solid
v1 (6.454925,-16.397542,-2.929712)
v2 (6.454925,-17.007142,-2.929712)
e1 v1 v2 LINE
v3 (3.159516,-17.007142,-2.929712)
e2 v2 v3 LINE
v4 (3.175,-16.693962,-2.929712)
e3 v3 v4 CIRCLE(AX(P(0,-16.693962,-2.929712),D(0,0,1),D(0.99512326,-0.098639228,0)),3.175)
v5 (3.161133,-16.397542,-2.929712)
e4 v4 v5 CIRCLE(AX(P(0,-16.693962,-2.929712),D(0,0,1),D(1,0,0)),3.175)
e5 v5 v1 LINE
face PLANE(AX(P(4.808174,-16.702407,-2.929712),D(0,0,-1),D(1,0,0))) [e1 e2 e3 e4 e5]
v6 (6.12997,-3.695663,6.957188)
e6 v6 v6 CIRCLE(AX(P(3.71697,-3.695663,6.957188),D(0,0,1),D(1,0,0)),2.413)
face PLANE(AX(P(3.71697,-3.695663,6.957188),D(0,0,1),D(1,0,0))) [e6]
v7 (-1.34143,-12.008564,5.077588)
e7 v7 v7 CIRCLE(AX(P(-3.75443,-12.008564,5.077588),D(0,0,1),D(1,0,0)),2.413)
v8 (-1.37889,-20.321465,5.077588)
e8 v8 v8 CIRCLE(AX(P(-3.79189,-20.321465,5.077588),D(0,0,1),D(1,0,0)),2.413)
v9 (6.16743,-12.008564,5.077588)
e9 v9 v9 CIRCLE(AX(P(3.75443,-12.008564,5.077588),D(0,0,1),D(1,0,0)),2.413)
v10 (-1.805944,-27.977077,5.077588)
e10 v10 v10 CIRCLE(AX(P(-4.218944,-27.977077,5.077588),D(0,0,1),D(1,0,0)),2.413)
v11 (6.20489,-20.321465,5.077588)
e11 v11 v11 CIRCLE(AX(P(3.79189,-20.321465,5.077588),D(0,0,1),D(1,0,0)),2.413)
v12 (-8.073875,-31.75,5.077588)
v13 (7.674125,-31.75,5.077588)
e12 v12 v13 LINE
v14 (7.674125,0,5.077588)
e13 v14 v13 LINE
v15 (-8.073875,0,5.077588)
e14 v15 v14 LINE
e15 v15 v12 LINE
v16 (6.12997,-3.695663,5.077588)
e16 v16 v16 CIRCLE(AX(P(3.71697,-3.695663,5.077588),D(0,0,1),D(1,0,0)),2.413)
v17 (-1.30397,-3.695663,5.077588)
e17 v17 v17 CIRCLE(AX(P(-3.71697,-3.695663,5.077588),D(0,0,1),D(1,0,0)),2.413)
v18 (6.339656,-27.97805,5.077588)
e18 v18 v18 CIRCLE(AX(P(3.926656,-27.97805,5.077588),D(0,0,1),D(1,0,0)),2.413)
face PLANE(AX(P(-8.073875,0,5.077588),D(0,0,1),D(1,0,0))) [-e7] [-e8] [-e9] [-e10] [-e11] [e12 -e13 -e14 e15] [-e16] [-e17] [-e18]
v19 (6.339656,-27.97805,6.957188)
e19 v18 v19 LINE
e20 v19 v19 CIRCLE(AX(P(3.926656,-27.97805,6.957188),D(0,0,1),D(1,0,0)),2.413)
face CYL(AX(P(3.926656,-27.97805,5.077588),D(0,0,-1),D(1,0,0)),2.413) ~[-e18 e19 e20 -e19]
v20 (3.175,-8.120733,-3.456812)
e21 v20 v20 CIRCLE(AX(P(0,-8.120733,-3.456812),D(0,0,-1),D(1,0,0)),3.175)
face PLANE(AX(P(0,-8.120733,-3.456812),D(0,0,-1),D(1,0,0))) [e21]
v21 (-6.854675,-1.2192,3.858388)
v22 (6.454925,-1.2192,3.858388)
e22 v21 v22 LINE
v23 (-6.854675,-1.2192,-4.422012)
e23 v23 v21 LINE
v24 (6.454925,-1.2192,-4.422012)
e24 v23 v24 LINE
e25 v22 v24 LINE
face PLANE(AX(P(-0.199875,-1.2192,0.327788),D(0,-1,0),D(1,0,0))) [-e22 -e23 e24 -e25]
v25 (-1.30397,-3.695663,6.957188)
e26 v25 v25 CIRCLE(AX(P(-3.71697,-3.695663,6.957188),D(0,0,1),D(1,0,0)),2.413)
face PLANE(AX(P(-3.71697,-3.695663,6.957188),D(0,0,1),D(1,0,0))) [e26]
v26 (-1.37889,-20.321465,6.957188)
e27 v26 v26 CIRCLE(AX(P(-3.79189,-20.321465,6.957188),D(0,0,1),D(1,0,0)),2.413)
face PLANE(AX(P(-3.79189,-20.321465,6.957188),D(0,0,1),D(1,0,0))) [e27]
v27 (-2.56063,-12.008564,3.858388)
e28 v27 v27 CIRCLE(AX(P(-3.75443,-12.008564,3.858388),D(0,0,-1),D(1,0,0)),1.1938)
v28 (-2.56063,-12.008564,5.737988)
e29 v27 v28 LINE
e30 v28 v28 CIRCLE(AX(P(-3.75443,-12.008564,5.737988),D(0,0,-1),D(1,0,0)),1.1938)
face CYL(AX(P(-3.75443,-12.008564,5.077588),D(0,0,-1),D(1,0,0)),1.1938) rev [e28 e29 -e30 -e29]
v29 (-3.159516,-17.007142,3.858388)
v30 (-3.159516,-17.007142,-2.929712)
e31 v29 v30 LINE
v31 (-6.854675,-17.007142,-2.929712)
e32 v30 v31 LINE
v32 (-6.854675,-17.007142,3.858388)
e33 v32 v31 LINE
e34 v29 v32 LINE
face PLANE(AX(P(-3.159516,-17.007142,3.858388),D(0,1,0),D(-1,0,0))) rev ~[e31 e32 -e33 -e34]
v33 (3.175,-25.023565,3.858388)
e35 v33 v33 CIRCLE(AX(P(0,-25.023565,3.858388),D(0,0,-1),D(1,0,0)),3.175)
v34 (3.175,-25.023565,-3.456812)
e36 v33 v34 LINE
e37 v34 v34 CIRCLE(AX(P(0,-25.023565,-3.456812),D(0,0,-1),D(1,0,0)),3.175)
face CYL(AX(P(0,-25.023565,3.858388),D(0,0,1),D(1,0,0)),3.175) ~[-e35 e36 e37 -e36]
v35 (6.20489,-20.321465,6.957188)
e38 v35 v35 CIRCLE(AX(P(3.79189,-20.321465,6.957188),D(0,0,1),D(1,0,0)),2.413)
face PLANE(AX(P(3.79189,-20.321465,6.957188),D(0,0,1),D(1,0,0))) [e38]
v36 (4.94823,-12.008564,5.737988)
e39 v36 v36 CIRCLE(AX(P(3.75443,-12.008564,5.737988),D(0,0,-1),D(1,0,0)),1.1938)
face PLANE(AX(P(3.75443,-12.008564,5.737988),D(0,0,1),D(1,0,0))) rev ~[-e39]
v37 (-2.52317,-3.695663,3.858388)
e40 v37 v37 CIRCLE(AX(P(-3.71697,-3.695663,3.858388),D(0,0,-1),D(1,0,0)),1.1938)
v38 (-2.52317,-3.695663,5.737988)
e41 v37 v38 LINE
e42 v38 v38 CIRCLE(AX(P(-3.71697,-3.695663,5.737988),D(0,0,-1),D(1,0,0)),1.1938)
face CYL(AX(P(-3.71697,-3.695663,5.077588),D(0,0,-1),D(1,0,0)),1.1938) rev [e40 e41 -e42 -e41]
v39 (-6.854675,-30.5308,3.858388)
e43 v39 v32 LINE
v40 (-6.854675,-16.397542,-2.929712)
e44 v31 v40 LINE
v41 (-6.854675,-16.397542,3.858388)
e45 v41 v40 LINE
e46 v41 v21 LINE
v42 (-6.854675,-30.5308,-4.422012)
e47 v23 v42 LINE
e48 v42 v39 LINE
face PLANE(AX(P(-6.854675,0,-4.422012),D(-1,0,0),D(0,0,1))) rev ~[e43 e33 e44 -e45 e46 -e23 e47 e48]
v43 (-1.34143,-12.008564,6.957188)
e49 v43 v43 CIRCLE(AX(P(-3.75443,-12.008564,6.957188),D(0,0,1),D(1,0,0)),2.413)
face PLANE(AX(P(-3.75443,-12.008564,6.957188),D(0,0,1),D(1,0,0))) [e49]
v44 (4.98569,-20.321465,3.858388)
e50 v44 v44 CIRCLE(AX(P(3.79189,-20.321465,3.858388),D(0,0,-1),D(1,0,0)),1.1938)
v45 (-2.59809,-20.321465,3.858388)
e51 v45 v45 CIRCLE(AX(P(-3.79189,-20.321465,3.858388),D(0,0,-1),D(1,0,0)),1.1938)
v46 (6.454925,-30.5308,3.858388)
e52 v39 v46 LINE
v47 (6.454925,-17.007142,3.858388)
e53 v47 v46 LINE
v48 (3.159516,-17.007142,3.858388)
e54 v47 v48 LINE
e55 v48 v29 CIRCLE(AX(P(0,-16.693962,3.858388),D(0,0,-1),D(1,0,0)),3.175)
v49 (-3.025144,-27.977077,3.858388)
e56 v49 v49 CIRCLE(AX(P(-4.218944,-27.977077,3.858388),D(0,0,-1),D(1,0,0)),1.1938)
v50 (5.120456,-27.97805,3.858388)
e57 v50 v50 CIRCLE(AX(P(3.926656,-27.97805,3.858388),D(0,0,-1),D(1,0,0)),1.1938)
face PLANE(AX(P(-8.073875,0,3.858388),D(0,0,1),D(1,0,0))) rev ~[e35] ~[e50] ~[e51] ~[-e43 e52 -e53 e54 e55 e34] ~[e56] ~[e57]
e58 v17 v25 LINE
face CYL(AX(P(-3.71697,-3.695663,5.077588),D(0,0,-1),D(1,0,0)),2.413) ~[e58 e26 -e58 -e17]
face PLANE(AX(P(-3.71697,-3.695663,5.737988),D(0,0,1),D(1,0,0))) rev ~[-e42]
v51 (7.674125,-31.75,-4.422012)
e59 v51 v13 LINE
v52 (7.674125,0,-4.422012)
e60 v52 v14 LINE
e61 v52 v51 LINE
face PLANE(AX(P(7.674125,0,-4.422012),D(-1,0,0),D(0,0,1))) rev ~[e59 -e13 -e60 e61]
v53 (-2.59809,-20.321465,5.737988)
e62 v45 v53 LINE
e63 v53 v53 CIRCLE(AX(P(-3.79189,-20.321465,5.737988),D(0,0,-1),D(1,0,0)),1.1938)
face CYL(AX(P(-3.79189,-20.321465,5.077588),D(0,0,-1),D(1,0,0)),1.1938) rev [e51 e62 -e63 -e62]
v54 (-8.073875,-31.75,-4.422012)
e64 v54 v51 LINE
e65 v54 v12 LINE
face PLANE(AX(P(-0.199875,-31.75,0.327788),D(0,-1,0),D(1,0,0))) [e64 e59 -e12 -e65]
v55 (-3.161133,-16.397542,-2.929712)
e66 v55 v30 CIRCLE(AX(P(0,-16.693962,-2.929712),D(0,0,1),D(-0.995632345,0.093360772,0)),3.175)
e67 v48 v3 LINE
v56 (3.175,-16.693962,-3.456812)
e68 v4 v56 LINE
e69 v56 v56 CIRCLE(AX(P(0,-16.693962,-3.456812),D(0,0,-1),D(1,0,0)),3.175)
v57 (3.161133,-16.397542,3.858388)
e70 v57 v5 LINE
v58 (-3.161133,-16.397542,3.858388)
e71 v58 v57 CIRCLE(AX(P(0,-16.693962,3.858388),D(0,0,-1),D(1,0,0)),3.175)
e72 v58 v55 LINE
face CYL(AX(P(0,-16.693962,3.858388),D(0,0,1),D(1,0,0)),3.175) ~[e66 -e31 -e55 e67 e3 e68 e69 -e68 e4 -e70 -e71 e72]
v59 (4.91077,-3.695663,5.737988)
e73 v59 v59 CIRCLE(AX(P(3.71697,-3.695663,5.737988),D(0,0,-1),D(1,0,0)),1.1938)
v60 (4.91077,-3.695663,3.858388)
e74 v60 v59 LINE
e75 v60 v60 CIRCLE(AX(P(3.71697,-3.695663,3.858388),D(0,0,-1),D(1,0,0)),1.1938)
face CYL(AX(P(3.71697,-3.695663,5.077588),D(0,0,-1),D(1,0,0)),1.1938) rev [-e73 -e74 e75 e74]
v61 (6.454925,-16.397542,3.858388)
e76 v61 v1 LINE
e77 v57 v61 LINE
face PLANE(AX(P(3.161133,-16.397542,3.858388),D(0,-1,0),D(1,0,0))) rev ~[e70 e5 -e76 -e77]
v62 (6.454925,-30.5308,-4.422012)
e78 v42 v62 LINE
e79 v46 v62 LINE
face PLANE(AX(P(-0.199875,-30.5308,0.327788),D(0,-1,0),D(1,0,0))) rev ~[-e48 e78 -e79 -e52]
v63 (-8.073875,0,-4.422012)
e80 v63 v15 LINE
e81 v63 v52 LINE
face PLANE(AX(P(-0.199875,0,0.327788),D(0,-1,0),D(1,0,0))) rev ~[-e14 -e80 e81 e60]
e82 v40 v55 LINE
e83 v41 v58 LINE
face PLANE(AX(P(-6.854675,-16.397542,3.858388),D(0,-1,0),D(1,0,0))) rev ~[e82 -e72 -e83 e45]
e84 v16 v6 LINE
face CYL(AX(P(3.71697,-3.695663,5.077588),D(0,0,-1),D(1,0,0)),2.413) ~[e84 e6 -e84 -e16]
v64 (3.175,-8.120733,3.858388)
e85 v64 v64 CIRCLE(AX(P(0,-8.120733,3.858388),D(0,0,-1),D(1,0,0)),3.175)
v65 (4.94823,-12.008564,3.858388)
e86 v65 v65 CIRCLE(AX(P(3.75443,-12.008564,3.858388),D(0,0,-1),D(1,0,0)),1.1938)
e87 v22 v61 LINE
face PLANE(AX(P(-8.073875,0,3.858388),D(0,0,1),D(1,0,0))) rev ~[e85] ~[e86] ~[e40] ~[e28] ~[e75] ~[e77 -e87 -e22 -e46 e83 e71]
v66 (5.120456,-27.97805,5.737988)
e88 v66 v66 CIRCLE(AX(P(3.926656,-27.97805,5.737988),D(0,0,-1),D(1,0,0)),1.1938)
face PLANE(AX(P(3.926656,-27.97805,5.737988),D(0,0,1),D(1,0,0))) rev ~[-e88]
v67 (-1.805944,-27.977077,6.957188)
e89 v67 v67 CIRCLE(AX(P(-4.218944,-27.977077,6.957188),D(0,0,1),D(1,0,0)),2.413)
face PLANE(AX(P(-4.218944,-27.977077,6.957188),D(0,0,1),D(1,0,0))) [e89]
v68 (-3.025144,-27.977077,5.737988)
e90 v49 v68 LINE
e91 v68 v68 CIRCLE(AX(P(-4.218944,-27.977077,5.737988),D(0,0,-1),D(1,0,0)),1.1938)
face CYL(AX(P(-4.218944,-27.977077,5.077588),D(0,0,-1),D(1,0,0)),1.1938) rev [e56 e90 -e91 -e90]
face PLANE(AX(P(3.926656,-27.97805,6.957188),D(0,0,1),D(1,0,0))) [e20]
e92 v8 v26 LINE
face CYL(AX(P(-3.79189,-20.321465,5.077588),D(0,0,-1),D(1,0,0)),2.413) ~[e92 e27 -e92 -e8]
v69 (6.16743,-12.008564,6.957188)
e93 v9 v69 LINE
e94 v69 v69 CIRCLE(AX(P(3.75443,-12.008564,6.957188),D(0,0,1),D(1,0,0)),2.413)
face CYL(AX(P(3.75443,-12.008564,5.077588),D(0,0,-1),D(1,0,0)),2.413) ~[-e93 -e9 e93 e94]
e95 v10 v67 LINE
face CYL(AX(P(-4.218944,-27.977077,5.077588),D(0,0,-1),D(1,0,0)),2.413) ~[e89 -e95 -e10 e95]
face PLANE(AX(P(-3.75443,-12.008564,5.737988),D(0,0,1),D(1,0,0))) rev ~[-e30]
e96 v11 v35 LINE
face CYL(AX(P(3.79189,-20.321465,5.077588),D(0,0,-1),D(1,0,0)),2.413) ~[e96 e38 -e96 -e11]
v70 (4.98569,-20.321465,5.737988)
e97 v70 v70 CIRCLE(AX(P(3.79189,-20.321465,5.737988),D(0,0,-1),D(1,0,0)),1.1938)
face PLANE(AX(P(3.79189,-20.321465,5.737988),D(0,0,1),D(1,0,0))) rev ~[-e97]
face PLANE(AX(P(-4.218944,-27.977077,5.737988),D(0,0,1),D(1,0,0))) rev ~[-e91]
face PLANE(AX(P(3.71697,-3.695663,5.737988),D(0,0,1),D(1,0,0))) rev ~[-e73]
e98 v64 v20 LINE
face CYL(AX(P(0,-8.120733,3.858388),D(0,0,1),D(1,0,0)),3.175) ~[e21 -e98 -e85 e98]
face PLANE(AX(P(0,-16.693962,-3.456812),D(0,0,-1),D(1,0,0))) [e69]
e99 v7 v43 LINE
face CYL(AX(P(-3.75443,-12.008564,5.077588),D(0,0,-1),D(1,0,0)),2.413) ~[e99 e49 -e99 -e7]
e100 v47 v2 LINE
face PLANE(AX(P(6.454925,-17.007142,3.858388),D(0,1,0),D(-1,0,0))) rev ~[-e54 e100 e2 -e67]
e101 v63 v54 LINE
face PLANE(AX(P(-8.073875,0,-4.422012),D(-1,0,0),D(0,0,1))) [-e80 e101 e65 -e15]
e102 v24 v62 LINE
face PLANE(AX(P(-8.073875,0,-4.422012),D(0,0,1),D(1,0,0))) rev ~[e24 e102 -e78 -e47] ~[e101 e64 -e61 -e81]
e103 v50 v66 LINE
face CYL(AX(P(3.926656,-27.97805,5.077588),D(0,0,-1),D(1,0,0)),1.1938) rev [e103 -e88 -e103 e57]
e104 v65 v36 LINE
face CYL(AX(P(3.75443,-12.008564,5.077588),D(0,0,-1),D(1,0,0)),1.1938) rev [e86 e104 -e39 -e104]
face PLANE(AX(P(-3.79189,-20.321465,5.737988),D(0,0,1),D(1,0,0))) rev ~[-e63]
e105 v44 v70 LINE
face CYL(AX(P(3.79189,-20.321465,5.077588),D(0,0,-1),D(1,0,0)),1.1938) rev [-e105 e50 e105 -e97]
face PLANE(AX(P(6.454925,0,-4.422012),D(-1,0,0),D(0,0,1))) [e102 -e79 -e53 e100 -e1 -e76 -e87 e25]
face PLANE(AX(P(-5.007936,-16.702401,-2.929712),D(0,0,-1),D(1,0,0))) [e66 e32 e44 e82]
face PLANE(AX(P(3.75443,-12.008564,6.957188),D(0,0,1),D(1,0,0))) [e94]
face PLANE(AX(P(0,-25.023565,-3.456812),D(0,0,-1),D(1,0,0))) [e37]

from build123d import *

# Parameters (mm, degrees)
F0_W      = 15.748
F0_H      = 9.4996
F1_DEPTH  = 31.75
F2_R      = 2.413
F4_DEPTH  = 1.8796
F3_R      = 2.413
F5_DEPTH  = 1.8796
F6_T      = -1.2192
F7_R      = 3.175
F8_DEPTH  = 7.3152
F9_DEPTH  = 7.3152
F10_DEPTH = 7.3152
F12_DEPTH = 6.7881


with BuildPart() as f1:
    # F0 (on Front) → F1 (new body)
    with BuildSketch(Plane.XZ):
        with Locations((-0.199874863, 0.3277875761)):
            Rectangle(F0_W, F0_H)
    extrude(amount=F1_DEPTH)

    # F2 (on face) → F4 (join)
    with BuildSketch(Plane.XY.offset(5.0775875761)):
        with Locations((-4.2189443147, -27.9770765305)):
            Circle(F2_R)
        with Locations((3.9266556272, -27.978049837)):
            Circle(F2_R)
    extrude(amount=F4_DEPTH)

    # F3 (on face) → F5 (join)
    with BuildSketch(Plane.XY.offset(5.0775875761)):
        with Locations((3.7918896414, -20.3214651638)):
            Circle(F3_R)
        with Locations((3.75443, -12.0085638718)):
            Circle(F3_R)
        with Locations((3.7169703586, -3.6956625797)):
            Circle(F3_R)
        with Locations((-3.7169703586, -3.6956625797)):
            Circle(F3_R)
        with Locations((-3.75443, -12.0085638718)):
            Circle(F3_R)
        with Locations((-3.7918896414, -20.3214651638)):
            Circle(F3_R)
    extrude(amount=F5_DEPTH)

    # F6
    f6_openings = [f1.faces().sort_by_distance(p)[0] for p in [
        (-0.199875, -15.875, -4.422012),
    ]]
    offset(amount=F6_T, openings=f6_openings, kind=Kind.INTERSECTION)

    # F7 (on face) → F8 (join)
    with BuildSketch(Plane(origin=(0, 0, 3.8583875761), x_dir=(1, 0, 0), z_dir=(0, 0, -1))):
        with Locations((0, 8.1207330356)):
            Circle(F7_R)
    extrude(amount=F8_DEPTH)

    # F7 (on face) → F9 (join)
    with BuildSketch(Plane(origin=(0, 0, 3.8583875761), x_dir=(1, 0, 0), z_dir=(0, 0, -1))):
        with Locations((0, 25.0235652365)):
            Circle(F7_R)
    extrude(amount=F9_DEPTH)

    # F7 (on face) → F10 (join)
    with BuildSketch(Plane(origin=(0, 0, 3.8583875761), x_dir=(1, 0, 0), z_dir=(0, 0, -1))):
        with BuildLine():
            ThreePointArc((-3.175, 16.6939621039), (0, 13.5189621039), (3.175, 16.6939621039))
            ThreePointArc((3.175, 16.6939621039), (0, 19.8689621039), (-3.175, 16.6939621039))
        make_face()
    extrude(amount=F10_DEPTH)

    # F11 (on face) → F12 (join)
    with BuildSketch(Plane(origin=(0, 0, 3.8583875761), x_dir=(1, 0, 0), z_dir=(0, 0, -1))):
        with BuildLine():
            ThreePointArc((-3.1611326952, 16.3975416535), (-3.1749888394, 16.7023805357), (-3.1595163506, 17.0071416535))
            Line((-3.1595163506, 17.0071416535), (-6.854674863, 17.0071416535))
            Line((-6.854674863, 17.0071416535), (-6.854674863, 16.3975416535))
            Line((-6.854674863, 16.3975416535), (-3.1611326952, 16.3975416535))
        make_face()
        with BuildLine():
            Line((6.454925137, 17.0071416535), (3.1595163506, 17.0071416535))
            ThreePointArc((3.1595163506, 17.0071416535), (3.1711267251, 16.8507431404), (3.175, 16.6939621039))
            ThreePointArc((3.175, 16.6939621039), (3.171531279, 16.5455897804), (3.1611326952, 16.3975416535))
            Line((3.1611326952, 16.3975416535), (6.454925137, 16.3975416535))
            Line((6.454925137, 16.3975416535), (6.454925137, 17.0071416535))
        make_face()
    extrude(amount=F12_DEPTH)


solid = f1.part
